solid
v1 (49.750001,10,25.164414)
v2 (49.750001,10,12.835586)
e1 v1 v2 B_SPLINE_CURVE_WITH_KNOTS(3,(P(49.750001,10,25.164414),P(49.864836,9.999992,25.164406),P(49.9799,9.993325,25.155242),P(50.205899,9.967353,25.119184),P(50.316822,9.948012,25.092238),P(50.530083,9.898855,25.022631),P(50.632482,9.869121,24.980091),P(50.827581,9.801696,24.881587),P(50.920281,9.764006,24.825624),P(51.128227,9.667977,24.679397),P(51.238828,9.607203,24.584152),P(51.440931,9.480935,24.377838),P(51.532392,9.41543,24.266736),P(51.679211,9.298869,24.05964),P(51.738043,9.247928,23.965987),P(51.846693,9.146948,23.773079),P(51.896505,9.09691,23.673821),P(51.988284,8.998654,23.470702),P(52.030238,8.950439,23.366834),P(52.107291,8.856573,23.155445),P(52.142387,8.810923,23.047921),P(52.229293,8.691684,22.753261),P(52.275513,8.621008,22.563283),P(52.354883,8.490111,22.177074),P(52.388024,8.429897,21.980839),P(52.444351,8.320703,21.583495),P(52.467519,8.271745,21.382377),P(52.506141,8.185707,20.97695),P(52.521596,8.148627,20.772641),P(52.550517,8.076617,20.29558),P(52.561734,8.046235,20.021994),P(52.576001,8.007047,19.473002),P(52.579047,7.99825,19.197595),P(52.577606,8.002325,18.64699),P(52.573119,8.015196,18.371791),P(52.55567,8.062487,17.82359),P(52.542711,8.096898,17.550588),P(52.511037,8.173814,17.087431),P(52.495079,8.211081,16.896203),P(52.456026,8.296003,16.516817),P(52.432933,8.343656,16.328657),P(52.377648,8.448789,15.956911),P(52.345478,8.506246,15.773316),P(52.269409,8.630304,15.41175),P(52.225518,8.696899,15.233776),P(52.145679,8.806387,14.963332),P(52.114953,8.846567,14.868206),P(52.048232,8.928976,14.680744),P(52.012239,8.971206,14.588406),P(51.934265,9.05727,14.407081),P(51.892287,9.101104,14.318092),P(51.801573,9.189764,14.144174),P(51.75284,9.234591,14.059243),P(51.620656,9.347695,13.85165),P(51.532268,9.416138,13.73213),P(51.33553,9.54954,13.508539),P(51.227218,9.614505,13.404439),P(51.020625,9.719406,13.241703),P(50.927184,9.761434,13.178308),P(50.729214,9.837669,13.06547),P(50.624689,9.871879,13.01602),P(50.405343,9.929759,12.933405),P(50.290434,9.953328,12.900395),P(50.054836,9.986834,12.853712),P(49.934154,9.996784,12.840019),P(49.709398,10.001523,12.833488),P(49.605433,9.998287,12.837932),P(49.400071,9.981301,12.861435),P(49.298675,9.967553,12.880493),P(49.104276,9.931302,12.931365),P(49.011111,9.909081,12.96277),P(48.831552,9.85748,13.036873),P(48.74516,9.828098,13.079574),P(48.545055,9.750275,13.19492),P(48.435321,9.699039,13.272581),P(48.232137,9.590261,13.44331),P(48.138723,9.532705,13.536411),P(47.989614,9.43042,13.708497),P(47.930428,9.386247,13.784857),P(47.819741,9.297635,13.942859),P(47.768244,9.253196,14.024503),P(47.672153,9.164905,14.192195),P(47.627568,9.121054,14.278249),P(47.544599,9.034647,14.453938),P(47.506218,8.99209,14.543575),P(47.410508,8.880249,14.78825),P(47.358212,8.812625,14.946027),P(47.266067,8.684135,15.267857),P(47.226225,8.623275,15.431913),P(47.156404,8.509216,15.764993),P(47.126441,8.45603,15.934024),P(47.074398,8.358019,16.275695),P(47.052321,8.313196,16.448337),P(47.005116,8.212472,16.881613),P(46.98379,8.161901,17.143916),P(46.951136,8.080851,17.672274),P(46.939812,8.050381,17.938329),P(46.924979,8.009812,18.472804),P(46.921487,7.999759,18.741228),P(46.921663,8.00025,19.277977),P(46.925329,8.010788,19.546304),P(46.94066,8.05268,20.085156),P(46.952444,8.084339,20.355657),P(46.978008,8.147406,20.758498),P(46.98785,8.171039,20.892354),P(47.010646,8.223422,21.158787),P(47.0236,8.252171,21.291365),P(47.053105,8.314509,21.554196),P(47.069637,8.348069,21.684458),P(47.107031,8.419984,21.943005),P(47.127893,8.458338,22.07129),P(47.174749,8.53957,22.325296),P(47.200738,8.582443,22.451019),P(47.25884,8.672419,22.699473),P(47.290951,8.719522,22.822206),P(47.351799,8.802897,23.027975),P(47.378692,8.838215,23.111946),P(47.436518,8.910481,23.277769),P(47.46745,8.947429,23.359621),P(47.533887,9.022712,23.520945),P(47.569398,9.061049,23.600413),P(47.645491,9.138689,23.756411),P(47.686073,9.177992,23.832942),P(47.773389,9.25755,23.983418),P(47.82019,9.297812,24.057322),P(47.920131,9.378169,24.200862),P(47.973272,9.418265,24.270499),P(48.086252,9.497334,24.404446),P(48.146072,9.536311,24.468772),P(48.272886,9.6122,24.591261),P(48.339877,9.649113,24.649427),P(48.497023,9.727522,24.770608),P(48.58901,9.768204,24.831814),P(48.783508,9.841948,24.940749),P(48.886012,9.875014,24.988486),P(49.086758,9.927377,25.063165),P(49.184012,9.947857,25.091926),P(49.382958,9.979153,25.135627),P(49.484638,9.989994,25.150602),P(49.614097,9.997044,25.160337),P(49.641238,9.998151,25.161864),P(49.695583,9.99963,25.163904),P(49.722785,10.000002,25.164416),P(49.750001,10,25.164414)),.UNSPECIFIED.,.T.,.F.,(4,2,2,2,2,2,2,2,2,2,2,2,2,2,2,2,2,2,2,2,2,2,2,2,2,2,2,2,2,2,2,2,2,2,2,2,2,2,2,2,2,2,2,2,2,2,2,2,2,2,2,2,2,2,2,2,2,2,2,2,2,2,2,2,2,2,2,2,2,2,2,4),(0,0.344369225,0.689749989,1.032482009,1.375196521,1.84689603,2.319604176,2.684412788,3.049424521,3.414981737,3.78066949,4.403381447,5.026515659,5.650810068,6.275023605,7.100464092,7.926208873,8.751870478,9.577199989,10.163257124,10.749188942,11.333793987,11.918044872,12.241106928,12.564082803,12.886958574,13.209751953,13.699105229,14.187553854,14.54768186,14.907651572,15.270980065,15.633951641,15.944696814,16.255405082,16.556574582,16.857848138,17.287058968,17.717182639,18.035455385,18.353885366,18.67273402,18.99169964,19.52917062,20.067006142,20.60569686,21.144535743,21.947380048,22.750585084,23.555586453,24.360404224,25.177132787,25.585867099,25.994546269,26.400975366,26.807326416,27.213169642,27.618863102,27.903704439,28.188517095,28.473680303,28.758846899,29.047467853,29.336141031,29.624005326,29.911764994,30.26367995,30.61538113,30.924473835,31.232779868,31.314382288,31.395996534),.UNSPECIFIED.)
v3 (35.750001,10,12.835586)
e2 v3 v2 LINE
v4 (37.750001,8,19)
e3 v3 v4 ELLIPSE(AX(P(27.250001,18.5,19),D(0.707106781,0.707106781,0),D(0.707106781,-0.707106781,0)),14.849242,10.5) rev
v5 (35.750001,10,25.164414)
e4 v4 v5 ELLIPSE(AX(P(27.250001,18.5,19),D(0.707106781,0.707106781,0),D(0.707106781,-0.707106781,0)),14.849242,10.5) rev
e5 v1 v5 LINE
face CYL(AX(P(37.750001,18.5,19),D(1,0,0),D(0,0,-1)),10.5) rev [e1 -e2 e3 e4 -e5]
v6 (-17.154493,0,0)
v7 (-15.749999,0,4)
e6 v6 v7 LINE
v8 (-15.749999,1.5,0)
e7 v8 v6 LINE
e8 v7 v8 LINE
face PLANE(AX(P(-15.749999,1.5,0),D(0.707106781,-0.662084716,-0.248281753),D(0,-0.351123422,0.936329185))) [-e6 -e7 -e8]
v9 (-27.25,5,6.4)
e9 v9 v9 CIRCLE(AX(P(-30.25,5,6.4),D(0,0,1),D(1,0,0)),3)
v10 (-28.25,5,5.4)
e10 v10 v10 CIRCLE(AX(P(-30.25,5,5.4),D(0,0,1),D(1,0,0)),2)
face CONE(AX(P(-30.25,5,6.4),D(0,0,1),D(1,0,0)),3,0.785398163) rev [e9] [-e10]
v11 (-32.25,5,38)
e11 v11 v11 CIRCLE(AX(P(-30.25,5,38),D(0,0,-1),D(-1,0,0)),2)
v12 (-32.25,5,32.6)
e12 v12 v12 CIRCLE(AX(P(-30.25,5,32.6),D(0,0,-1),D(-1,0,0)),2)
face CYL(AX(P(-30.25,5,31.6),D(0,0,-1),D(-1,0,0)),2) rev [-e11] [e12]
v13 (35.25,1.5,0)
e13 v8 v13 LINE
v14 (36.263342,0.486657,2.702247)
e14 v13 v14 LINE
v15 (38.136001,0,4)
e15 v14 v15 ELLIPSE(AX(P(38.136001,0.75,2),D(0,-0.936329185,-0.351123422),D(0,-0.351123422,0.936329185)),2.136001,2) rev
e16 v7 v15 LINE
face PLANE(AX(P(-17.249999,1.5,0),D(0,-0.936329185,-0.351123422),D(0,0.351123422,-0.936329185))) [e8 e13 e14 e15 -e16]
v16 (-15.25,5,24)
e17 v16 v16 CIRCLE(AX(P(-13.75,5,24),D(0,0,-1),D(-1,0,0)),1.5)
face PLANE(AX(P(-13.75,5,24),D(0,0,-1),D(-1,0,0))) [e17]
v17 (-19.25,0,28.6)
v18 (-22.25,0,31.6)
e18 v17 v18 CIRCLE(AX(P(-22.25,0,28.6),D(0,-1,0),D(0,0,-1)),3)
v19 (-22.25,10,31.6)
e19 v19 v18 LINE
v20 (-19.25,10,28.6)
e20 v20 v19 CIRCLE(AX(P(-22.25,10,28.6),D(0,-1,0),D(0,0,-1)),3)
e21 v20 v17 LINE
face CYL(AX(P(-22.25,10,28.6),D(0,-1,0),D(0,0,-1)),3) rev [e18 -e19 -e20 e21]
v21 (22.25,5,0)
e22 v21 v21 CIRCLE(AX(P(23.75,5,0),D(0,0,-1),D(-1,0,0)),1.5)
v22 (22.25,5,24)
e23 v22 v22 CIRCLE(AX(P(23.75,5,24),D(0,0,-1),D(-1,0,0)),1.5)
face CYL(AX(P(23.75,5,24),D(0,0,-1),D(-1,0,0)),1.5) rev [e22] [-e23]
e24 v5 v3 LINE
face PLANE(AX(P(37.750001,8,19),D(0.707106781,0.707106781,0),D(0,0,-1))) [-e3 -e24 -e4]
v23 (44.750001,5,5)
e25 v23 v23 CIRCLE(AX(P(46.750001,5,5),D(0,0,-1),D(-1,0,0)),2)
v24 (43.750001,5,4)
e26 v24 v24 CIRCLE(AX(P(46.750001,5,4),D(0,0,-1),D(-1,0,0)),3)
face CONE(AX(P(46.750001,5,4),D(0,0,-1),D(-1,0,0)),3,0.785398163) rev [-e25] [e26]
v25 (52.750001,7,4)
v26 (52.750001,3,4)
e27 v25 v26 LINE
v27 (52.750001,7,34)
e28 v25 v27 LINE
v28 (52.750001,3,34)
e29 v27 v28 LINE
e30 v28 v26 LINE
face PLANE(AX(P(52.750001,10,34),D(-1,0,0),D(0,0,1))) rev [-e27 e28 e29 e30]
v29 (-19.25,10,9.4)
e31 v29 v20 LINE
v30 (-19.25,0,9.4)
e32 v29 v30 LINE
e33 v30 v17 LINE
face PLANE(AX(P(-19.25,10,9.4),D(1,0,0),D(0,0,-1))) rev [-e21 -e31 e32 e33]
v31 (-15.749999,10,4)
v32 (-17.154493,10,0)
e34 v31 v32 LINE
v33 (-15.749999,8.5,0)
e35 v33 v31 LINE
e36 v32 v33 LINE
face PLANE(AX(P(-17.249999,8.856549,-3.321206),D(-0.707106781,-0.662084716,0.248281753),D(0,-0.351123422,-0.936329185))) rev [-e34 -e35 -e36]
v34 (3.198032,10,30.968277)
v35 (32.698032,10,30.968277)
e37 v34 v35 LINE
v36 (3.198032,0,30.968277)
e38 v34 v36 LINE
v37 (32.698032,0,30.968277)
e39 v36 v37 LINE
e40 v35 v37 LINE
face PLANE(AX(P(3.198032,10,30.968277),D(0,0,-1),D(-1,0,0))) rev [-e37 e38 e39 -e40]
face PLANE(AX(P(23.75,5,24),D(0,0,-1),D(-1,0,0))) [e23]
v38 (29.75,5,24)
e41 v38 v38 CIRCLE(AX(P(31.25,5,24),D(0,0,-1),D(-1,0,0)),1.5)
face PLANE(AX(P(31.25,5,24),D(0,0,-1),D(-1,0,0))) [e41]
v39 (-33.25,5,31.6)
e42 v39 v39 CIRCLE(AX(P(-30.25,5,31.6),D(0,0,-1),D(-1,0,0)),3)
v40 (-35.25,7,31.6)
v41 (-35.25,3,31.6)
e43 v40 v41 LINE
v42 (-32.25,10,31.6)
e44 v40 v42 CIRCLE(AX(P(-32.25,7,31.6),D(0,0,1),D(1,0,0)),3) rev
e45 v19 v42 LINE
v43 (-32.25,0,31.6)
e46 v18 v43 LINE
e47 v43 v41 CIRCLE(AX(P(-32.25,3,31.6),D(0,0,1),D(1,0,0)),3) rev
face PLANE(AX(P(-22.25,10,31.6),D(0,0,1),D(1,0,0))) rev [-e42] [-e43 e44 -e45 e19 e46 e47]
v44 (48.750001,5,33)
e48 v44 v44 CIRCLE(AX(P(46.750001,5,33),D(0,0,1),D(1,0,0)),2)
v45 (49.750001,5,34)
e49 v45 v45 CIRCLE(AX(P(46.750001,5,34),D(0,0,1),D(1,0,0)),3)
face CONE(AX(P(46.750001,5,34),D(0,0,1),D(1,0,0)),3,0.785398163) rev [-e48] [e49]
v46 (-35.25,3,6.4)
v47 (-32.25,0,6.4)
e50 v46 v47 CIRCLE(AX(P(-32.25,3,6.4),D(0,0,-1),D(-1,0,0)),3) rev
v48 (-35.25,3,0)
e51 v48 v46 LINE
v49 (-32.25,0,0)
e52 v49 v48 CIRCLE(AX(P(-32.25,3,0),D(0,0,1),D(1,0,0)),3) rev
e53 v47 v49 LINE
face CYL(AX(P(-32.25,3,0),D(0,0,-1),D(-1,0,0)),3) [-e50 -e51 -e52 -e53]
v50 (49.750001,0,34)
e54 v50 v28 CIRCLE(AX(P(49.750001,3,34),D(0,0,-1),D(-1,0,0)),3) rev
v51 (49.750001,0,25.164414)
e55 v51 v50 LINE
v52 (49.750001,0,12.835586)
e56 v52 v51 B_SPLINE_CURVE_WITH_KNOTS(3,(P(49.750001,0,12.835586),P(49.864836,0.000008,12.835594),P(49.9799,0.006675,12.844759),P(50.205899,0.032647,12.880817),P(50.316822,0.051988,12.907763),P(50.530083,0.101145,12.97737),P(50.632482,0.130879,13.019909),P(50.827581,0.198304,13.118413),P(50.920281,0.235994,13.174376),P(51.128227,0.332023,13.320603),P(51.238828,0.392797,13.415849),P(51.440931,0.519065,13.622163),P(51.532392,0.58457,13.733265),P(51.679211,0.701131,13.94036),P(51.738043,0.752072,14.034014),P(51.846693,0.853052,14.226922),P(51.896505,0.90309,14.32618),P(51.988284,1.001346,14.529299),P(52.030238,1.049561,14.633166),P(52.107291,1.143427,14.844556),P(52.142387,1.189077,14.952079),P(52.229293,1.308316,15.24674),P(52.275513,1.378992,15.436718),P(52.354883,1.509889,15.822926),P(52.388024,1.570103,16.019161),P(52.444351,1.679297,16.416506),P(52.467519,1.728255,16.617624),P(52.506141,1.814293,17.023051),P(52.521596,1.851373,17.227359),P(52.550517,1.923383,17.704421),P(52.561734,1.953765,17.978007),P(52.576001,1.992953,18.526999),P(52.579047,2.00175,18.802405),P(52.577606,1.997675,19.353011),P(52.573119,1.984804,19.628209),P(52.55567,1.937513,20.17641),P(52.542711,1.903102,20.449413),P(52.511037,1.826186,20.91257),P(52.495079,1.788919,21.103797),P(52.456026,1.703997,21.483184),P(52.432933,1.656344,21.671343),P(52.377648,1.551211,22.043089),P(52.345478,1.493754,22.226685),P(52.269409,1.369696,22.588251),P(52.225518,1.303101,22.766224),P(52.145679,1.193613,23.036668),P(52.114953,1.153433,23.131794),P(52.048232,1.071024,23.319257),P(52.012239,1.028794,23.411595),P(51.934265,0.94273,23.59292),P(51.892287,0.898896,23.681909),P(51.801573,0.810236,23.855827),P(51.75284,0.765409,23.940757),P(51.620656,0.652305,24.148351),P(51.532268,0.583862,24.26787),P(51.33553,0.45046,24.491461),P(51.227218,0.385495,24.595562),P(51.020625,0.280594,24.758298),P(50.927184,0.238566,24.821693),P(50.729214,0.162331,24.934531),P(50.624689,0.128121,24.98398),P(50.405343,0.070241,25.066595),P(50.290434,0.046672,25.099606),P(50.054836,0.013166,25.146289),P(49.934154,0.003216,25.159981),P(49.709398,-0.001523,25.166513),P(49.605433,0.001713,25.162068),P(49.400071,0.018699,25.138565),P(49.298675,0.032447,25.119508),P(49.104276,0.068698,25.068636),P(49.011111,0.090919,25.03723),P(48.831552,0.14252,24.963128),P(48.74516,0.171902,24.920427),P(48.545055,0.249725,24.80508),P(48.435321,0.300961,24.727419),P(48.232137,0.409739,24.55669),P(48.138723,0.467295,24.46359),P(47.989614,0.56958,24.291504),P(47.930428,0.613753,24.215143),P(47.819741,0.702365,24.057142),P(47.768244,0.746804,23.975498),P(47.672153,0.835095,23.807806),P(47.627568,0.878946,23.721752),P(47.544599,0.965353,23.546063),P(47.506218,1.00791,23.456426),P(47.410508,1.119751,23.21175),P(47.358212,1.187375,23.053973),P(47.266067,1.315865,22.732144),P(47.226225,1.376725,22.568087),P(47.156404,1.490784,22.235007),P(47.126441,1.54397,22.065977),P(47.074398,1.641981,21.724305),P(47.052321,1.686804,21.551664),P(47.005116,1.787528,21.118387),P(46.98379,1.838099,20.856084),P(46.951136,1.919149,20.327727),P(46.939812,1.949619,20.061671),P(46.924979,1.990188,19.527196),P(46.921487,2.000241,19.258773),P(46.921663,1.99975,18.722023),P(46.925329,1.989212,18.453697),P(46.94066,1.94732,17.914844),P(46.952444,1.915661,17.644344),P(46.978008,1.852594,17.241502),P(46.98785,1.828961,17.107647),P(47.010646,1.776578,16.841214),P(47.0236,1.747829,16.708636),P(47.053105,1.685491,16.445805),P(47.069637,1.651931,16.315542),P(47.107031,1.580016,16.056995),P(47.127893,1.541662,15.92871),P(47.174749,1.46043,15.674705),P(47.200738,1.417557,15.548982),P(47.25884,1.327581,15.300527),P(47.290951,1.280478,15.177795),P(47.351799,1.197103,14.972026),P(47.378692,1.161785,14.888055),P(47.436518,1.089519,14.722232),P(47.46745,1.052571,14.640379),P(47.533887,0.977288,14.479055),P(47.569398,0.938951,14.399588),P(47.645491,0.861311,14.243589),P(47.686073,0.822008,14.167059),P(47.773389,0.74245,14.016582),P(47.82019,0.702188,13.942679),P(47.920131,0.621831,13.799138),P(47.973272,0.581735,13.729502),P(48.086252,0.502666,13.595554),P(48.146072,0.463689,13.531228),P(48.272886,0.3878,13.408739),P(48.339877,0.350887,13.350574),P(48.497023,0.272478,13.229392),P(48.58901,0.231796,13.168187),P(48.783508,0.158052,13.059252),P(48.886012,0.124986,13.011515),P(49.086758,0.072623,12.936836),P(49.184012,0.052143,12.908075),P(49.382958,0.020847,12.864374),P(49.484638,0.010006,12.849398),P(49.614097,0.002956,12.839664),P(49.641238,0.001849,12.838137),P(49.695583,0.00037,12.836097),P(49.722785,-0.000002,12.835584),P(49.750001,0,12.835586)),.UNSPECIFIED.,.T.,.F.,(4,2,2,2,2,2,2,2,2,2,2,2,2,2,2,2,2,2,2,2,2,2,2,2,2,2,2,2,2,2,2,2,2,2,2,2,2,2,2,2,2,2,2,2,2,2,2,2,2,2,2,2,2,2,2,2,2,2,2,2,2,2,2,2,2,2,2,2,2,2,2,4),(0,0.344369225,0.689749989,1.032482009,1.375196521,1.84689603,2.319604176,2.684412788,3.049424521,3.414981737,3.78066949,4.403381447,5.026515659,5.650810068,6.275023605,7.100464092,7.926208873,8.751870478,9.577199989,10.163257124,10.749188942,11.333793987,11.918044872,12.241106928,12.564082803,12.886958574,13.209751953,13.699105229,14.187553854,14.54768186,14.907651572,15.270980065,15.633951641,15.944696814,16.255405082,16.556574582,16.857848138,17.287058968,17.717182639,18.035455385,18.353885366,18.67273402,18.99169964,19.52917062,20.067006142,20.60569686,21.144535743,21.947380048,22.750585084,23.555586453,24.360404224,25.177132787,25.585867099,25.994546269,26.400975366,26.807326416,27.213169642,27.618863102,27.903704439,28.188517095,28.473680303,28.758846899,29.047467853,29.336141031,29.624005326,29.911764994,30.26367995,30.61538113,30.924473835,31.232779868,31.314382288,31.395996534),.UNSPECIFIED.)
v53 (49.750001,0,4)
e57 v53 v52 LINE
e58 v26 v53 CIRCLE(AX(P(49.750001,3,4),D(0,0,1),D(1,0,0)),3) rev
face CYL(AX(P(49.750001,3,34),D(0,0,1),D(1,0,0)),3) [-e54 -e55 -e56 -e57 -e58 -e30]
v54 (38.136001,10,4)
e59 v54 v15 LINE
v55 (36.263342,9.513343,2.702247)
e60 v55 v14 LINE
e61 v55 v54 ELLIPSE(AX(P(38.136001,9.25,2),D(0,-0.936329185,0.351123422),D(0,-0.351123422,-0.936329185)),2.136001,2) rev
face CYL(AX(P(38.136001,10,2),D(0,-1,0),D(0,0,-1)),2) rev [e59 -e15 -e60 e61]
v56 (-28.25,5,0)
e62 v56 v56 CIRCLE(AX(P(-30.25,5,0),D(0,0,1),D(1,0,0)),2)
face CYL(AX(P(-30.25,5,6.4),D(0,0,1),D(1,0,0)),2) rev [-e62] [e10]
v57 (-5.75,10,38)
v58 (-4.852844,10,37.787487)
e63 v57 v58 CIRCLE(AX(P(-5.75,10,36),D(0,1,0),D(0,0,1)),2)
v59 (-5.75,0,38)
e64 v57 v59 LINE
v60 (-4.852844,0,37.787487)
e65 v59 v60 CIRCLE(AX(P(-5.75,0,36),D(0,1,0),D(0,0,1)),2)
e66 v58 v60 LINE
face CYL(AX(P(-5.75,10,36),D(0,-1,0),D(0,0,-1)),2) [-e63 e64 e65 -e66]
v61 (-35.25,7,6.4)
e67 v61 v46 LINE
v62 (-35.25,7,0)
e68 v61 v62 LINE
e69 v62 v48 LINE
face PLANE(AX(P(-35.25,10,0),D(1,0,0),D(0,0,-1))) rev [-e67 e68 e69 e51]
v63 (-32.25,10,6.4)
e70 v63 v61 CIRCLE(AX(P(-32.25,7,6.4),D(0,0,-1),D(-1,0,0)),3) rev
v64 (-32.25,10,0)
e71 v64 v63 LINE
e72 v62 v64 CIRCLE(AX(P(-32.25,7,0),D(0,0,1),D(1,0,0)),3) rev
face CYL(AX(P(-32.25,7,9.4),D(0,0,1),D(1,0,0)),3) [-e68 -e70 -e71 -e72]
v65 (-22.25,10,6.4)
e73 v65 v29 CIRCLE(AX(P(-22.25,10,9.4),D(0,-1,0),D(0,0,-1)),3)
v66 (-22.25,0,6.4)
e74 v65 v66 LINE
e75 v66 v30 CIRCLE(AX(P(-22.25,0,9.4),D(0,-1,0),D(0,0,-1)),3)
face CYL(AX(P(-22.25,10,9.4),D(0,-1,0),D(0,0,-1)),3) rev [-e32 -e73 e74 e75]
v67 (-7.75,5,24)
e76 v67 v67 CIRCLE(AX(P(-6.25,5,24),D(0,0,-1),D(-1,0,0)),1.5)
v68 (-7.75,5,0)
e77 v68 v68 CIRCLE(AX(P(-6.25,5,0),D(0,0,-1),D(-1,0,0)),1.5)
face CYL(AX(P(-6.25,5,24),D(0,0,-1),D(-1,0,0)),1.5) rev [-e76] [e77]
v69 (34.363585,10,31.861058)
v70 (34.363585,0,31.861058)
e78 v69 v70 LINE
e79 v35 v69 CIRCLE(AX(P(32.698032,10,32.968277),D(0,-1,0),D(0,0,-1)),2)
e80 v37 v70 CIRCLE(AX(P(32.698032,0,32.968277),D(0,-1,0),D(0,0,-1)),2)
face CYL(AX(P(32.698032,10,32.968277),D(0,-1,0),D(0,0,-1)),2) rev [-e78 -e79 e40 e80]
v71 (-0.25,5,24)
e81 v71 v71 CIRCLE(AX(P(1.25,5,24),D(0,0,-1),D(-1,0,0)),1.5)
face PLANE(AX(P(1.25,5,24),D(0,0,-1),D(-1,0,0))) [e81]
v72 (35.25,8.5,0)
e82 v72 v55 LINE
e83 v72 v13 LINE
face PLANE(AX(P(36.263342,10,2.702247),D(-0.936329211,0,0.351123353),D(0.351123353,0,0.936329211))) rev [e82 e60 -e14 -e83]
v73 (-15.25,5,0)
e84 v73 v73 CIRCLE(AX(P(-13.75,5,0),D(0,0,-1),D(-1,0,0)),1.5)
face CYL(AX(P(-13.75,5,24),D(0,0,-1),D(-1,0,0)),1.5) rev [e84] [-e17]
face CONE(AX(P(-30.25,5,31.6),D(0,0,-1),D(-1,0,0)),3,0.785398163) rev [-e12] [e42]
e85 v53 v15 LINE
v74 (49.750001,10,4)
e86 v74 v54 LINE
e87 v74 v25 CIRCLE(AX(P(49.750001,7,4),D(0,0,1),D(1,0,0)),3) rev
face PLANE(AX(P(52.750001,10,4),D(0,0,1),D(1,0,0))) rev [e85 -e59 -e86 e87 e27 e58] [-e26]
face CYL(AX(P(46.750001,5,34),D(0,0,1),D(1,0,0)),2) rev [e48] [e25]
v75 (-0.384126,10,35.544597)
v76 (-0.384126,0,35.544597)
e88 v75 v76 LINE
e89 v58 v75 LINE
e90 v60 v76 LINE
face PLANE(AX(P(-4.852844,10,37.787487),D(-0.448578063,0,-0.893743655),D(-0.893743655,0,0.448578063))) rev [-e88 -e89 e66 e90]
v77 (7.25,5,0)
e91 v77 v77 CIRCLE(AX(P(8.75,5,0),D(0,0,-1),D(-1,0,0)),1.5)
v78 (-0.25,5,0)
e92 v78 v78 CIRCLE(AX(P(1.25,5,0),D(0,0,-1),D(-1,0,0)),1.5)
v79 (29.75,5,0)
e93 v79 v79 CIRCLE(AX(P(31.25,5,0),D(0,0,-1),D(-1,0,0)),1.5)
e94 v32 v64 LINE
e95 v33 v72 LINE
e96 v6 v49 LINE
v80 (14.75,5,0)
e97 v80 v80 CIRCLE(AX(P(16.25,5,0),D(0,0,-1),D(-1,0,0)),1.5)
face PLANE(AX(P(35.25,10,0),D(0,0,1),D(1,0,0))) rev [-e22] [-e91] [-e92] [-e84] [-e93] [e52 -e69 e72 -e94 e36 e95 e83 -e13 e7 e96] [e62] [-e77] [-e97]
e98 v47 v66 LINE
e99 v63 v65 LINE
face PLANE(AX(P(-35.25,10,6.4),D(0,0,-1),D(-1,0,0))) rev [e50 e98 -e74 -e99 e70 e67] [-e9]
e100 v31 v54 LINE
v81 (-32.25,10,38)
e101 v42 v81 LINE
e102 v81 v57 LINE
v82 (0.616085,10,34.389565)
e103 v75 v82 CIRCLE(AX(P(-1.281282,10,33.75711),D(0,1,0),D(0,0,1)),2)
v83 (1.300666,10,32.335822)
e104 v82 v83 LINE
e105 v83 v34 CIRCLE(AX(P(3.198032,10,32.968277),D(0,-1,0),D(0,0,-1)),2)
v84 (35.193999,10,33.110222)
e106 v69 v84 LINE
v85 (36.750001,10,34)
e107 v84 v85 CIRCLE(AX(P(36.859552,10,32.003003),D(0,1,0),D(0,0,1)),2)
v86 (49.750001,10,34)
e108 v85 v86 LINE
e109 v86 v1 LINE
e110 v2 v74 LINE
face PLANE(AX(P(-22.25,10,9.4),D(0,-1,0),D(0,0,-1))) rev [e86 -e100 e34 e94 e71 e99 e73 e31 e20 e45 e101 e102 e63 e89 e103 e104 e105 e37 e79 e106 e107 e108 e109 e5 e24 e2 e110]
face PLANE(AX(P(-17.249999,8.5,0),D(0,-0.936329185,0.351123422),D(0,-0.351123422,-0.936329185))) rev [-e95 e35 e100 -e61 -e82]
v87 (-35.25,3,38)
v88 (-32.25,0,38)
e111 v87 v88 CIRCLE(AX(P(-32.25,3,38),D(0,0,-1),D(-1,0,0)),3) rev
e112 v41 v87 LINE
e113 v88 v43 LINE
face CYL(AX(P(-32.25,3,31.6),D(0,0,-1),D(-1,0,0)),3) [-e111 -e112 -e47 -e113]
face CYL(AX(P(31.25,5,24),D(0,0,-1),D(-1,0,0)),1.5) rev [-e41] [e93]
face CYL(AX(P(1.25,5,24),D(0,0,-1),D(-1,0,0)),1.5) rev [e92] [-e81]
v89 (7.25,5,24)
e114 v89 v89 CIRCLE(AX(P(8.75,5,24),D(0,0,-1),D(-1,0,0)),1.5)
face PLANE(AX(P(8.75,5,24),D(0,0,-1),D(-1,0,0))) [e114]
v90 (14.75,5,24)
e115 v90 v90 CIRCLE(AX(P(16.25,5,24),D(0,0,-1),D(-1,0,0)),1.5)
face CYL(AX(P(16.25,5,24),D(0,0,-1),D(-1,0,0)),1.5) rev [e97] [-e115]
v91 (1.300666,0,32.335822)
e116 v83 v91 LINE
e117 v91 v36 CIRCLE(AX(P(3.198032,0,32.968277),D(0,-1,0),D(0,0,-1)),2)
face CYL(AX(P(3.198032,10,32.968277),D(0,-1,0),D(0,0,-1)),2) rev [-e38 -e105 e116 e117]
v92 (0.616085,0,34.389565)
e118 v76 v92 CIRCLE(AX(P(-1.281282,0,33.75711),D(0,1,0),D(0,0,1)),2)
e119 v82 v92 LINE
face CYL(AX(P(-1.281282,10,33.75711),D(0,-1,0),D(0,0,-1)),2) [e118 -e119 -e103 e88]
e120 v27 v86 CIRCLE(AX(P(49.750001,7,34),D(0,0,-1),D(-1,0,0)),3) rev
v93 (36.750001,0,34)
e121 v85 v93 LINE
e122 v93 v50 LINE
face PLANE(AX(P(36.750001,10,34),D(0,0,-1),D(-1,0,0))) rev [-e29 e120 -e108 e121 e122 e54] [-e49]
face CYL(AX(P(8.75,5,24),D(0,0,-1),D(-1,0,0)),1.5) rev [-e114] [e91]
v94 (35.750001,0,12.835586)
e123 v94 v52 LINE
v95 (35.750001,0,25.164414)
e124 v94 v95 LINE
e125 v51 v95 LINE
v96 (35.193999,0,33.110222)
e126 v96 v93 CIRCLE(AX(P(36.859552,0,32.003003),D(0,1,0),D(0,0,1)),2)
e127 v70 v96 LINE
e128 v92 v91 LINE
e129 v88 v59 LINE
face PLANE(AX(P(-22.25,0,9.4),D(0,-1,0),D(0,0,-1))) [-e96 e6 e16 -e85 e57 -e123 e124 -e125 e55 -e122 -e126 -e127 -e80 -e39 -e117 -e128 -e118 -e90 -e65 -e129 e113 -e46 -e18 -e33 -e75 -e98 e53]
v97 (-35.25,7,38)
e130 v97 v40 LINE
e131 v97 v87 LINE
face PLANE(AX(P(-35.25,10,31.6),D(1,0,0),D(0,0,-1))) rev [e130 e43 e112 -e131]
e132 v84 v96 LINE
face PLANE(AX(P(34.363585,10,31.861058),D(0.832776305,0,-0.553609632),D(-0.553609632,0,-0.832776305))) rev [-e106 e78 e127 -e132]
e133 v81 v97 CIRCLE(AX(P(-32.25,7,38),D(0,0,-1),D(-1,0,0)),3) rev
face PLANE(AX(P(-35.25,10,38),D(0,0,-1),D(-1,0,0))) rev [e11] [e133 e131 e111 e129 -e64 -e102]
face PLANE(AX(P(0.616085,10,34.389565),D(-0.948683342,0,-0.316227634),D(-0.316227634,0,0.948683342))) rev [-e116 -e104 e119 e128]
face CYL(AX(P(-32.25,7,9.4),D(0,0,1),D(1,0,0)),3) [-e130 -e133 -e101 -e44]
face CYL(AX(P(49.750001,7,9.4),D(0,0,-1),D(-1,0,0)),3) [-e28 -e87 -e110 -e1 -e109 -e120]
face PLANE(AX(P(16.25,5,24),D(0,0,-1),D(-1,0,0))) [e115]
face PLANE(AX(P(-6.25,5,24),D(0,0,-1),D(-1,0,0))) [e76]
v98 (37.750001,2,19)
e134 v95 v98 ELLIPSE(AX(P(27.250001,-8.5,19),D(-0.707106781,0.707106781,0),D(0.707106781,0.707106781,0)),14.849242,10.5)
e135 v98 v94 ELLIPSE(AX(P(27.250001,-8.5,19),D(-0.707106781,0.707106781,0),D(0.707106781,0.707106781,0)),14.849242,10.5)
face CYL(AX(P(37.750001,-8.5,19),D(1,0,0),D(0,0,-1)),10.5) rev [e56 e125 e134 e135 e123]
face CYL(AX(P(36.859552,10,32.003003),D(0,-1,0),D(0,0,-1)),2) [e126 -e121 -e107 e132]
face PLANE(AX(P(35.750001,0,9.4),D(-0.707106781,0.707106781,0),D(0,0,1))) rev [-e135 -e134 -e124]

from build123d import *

# Parameters (mm, degrees)
BOSS_EXTRUDE1_DEPTH           = 10
FILLET1_R                     = 3
CUT_EXTRUDE1_DEPTH            = 55.386
CHAMFER1_SIZE                 = 1.5
MIRROR3_START                 = -3.745316975
MIRROR3_DEPTH                 = 4.272002108
CSK_FOR_M4_SFHCS1_D           = 4
CSK_FOR_M4_SFHCS1_DEPTH       = 6.4
CSK_FOR_M4_SFHCS1_CSINK_D     = 6
CSK_FOR_M4_SFHCS1_CSINK_ANGLE = 90
CSK_FOR_M4_SFHCS2_D           = 4
CSK_FOR_M4_SFHCS2_CSINK_D     = 6
CSK_FOR_M4_SFHCS2_CSINK_ANGLE = 90
SKETCH7_R                     = 1.5
CUT_EXTRUDE2_DEPTH            = 24
SKETCH8_R                     = 10.5
CUT_EXTRUDE3_DEPTH            = 15
CHAMFER2_SIZE                 = 2


# Read off the part's stored shape, not the designer's step: Mirror3
with BuildPart() as part:
    # Sketch1 → Boss-Extrude1 (new body)
    with BuildSketch(Plane(origin=(0, 0, 0), x_dir=(1, 0, 0), z_dir=(0, 1, 0))):
        with BuildLine():
            Line((-35.25, 0), (-35.25, -6.4))
            Line((-35.25, -6.4), (-22.25, -6.4))
            ThreePointArc((-22.25, -6.4), (-20.128679656, -7.278679656), (-19.25, -9.4))
            Line((-19.25, -9.4), (-19.25, -28.6))
            ThreePointArc((-19.25, -28.6), (-20.128679656, -30.721320344), (-22.25, -31.6))
            Line((-22.25, -31.6), (-35.25, -31.6))
            Line((-35.25, -31.6), (-35.25, -38))
            Line((-35.25, -38), (-5.75, -38))
            ThreePointArc((-5.75, -38), (-5.289009014, -37.946146786), (-4.852843875, -37.787487311))
            Line((-4.852843875, -37.787487311), (-0.384125597, -35.544596998))
            ThreePointArc((-0.384125597, -35.544596998), (0.230625744, -35.066359782), (0.616084961, -34.389564956))
            Line((0.616084961, -34.389564956), (1.30066574, -32.33582167))
            ThreePointArc((1.30066574, -32.33582167), (2.028611742, -31.34579265), (3.198032424, -30.968276939))
            Line((3.198032424, -30.968276939), (32.698032424, -30.968276939))
            ThreePointArc((32.698032424, -30.968276939), (33.642903174, -31.205546312), (34.363585035, -31.861057674))
            Line((34.363585035, -31.861057674), (35.193999483, -33.110222133))
            ThreePointArc((35.193999483, -33.110222133), (35.866740637, -33.73918414), (36.750000973, -34.000000252))
            Line((36.750000973, -34.000000252), (52.750000973, -34.000000252))
            Line((52.750000973, -34.000000252), (52.750000973, -4.000000252))
            Line((52.750000973, -4.000000252), (38.13600074, -4.000000252))
            ThreePointArc((38.13600074, -4.000000252), (36.996810987, -3.643851433), (36.263342318, -2.702246958))
            Line((36.263342318, -2.702246958), (35.25, 0))
            Line((35.25, 0), (-35.25, 0))
        make_face()
    extrude(amount=BOSS_EXTRUDE1_DEPTH)

    # Fillet1
    fillet1_edges = [part.edges().sort_by_distance(p)[0] for p in [
        (52.750000973, 0, 19.000000252),
        (-35.25, 0, 34.8),
        (-35.25, 0, 3.2),
        (-35.25, 10, 34.8),
        (52.750000973, 10, 19.000000252),
        (-35.25, 10, 3.2),
    ]]
    fillet(fillet1_edges, radius=FILLET1_R)

    # Sketch2 → Cut-Extrude1 (cut)
    with BuildSketch(Plane(origin=(38.13600074, 0, 0), x_dir=(0, 0, -1), z_dir=(1, 0, 0))):
        Polygon((-4.000000252, 10), (0, 10), (0, 8.5), align=None)
    extrude(amount=-CUT_EXTRUDE1_DEPTH, mode=Mode.SUBTRACT)

    # Chamfer1
    # the kernel refuses this chamfer: 1.5 mm, written as the material it adds along each edge
    with BuildSketch(Plane(origin=(-17.24999926, 7.145532803, -3.611912754), x_dir=(-0.027495876610586757, 0.9359751746095561, -0.35099066837171944), z_dir=(0, 0.3511234221997007, 0.9363291848398034))) as chamfer1_piece_1_section:
        Polygon((CHAMFER1_SIZE * 0.999621916911, -CHAMFER1_SIZE * 0.0274958766106), (-CHAMFER1_SIZE * 0.0274958766106, -CHAMFER1_SIZE * 0.999621916911), (0, 0), align=None)
    chamfer1_piece_1 = extrude(amount=11.987051072, mode=Mode.PRIVATE)
    chamfer1_piece_1 = split(chamfer1_piece_1, bisect_by=Plane(origin=(-16.68097762, 9.443284972, 0), z_dir=(0, 0, 1)), keep=Keep.TOP, mode=Mode.PRIVATE)
    chamfer1_piece_1 = split(chamfer1_piece_1, bisect_by=Plane(origin=(-16.68097762, 10, 1.484573502), z_dir=(0, -1, 0)), keep=Keep.TOP, mode=Mode.PRIVATE)
    add(chamfer1_piece_1)

    # Mirror3 outline → Mirror3 (cut)
    with BuildSketch(Plane(origin=(0, 0, 0), x_dir=(1, 0, 0), z_dir=(0, 0.3511234221997011, -0.9363291848398033)).offset(MIRROR3_START)):
        Polygon((-15.74999926, -1.404493777), (40, -1.404493777), (40, 2), (-19, 2), (-19, 1.845506963), align=None)
    extrude(amount=MIRROR3_DEPTH, mode=Mode.SUBTRACT)

    # CSK for M4 SFHCS1
    with Locations(Plane.XY.offset(6.4)):
        with Locations((-30.25, 5)):
            csk_for_m4_sfhcs1 = CounterSinkHole(CSK_FOR_M4_SFHCS1_D / 2, CSK_FOR_M4_SFHCS1_CSINK_D / 2, depth=CSK_FOR_M4_SFHCS1_DEPTH, counter_sink_angle=CSK_FOR_M4_SFHCS1_CSINK_ANGLE)

    # Mirror1: CSK for M4 SFHCS1 across plane
    add(csk_for_m4_sfhcs1.mirror(Plane.XY.offset(19)), mode=Mode.SUBTRACT)

    # CSK for M4 SFHCS2 (through all)
    with Locations(Plane.XY.offset(34.000000252)):
        with Locations((46.750000973, 5)):
            csk_for_m4_sfhcs2 = CounterSinkHole(CSK_FOR_M4_SFHCS2_D / 2, CSK_FOR_M4_SFHCS2_CSINK_D / 2, counter_sink_angle=CSK_FOR_M4_SFHCS2_CSINK_ANGLE)

    # Mirror2: CSK for M4 SFHCS2 across plane
    add(csk_for_m4_sfhcs2.mirror(Plane.XY.offset(19)), mode=Mode.SUBTRACT)

    # Sketch7 → Cut-Extrude2 (cut)
    with BuildSketch(Plane(origin=(0, 0, 0), x_dir=(-1, 0, 0), z_dir=(0, 0, -1))):
        with Locations((-31.25, 5)):
            Circle(SKETCH7_R)
        with Locations((-23.75, 5)):
            Circle(SKETCH7_R)
        with Locations((-16.25, 5)):
            Circle(SKETCH7_R)
        with Locations((-8.75, 5)):
            Circle(SKETCH7_R)
        with Locations((-1.25, 5)):
            Circle(SKETCH7_R)
        with Locations((6.25, 5)):
            Circle(SKETCH7_R)
        with Locations((13.75, 5)):
            Circle(SKETCH7_R)
    extrude(amount=-CUT_EXTRUDE2_DEPTH, mode=Mode.SUBTRACT)

    # Sketch8 → Cut-Extrude3 (cut)
    with BuildSketch(Plane(origin=(52.750000973, 0, 0), x_dir=(0, 0, -1), z_dir=(1, 0, 0))):
        with Locations((-19.000000252, 18.5)):
            Circle(SKETCH8_R)
        with Locations((-19.000000252, -8.5)):
            Circle(SKETCH8_R)
    extrude(amount=-CUT_EXTRUDE3_DEPTH, mode=Mode.SUBTRACT)

    # Chamfer2
    # the kernel refuses this chamfer: 2 mm, written as the material it adds along each edge
    # the kernel refuses this chamfer: 2 mm, written as the material it takes off along each edge
    with BuildSketch(Plane(origin=(37.750000973, 10, 7.692220273), x_dir=(-0.9996219169112968, 0.02749587661058651, 0), z_dir=(0, 0, 1))) as chamfer2_2_piece_1_section:
        Polygon((CHAMFER2_SIZE * 0.999621916911, CHAMFER2_SIZE * 0.0274958766106), (-CHAMFER2_SIZE * 0.0274958766106, CHAMFER2_SIZE * 0.999621916911), (0, 0), align=None)
    chamfer2_2_piece_1 = extrude(amount=22.615559958, mode=Mode.PRIVATE)
    chamfer2_2_piece_1 = chamfer2_2_piece_1 & Plane(origin=(37.038023767, 18.5, 19.000000252), x_dir=(0, 0, -1), z_dir=(1, 0, 0)) * Cylinder(10.5, 54, mode=Mode.PRIVATE)
    add(chamfer2_2_piece_1, mode=Mode.SUBTRACT)
    with BuildSketch(Plane(origin=(37.750000973, 0, 30.307780231), x_dir=(-0.9996219169112968, -0.02749587661058639, 0), z_dir=(0, 0, -1))) as chamfer2_2_piece_2_section:
        Polygon((CHAMFER2_SIZE * 0.999621916911, CHAMFER2_SIZE * 0.0274958766106), (-CHAMFER2_SIZE * 0.0274958766106, CHAMFER2_SIZE * 0.999621916911), (0, 0), align=None)
    chamfer2_2_piece_2 = extrude(amount=22.615559958, mode=Mode.PRIVATE)
    chamfer2_2_piece_2 = chamfer2_2_piece_2 & Plane(origin=(37.038023767, -8.5, 19.000000252), x_dir=(0, 0, -1), z_dir=(1, 0, 0)) * Cylinder(10.5, 54, mode=Mode.PRIVATE)
    add(chamfer2_2_piece_2, mode=Mode.SUBTRACT)


solid = part.part
